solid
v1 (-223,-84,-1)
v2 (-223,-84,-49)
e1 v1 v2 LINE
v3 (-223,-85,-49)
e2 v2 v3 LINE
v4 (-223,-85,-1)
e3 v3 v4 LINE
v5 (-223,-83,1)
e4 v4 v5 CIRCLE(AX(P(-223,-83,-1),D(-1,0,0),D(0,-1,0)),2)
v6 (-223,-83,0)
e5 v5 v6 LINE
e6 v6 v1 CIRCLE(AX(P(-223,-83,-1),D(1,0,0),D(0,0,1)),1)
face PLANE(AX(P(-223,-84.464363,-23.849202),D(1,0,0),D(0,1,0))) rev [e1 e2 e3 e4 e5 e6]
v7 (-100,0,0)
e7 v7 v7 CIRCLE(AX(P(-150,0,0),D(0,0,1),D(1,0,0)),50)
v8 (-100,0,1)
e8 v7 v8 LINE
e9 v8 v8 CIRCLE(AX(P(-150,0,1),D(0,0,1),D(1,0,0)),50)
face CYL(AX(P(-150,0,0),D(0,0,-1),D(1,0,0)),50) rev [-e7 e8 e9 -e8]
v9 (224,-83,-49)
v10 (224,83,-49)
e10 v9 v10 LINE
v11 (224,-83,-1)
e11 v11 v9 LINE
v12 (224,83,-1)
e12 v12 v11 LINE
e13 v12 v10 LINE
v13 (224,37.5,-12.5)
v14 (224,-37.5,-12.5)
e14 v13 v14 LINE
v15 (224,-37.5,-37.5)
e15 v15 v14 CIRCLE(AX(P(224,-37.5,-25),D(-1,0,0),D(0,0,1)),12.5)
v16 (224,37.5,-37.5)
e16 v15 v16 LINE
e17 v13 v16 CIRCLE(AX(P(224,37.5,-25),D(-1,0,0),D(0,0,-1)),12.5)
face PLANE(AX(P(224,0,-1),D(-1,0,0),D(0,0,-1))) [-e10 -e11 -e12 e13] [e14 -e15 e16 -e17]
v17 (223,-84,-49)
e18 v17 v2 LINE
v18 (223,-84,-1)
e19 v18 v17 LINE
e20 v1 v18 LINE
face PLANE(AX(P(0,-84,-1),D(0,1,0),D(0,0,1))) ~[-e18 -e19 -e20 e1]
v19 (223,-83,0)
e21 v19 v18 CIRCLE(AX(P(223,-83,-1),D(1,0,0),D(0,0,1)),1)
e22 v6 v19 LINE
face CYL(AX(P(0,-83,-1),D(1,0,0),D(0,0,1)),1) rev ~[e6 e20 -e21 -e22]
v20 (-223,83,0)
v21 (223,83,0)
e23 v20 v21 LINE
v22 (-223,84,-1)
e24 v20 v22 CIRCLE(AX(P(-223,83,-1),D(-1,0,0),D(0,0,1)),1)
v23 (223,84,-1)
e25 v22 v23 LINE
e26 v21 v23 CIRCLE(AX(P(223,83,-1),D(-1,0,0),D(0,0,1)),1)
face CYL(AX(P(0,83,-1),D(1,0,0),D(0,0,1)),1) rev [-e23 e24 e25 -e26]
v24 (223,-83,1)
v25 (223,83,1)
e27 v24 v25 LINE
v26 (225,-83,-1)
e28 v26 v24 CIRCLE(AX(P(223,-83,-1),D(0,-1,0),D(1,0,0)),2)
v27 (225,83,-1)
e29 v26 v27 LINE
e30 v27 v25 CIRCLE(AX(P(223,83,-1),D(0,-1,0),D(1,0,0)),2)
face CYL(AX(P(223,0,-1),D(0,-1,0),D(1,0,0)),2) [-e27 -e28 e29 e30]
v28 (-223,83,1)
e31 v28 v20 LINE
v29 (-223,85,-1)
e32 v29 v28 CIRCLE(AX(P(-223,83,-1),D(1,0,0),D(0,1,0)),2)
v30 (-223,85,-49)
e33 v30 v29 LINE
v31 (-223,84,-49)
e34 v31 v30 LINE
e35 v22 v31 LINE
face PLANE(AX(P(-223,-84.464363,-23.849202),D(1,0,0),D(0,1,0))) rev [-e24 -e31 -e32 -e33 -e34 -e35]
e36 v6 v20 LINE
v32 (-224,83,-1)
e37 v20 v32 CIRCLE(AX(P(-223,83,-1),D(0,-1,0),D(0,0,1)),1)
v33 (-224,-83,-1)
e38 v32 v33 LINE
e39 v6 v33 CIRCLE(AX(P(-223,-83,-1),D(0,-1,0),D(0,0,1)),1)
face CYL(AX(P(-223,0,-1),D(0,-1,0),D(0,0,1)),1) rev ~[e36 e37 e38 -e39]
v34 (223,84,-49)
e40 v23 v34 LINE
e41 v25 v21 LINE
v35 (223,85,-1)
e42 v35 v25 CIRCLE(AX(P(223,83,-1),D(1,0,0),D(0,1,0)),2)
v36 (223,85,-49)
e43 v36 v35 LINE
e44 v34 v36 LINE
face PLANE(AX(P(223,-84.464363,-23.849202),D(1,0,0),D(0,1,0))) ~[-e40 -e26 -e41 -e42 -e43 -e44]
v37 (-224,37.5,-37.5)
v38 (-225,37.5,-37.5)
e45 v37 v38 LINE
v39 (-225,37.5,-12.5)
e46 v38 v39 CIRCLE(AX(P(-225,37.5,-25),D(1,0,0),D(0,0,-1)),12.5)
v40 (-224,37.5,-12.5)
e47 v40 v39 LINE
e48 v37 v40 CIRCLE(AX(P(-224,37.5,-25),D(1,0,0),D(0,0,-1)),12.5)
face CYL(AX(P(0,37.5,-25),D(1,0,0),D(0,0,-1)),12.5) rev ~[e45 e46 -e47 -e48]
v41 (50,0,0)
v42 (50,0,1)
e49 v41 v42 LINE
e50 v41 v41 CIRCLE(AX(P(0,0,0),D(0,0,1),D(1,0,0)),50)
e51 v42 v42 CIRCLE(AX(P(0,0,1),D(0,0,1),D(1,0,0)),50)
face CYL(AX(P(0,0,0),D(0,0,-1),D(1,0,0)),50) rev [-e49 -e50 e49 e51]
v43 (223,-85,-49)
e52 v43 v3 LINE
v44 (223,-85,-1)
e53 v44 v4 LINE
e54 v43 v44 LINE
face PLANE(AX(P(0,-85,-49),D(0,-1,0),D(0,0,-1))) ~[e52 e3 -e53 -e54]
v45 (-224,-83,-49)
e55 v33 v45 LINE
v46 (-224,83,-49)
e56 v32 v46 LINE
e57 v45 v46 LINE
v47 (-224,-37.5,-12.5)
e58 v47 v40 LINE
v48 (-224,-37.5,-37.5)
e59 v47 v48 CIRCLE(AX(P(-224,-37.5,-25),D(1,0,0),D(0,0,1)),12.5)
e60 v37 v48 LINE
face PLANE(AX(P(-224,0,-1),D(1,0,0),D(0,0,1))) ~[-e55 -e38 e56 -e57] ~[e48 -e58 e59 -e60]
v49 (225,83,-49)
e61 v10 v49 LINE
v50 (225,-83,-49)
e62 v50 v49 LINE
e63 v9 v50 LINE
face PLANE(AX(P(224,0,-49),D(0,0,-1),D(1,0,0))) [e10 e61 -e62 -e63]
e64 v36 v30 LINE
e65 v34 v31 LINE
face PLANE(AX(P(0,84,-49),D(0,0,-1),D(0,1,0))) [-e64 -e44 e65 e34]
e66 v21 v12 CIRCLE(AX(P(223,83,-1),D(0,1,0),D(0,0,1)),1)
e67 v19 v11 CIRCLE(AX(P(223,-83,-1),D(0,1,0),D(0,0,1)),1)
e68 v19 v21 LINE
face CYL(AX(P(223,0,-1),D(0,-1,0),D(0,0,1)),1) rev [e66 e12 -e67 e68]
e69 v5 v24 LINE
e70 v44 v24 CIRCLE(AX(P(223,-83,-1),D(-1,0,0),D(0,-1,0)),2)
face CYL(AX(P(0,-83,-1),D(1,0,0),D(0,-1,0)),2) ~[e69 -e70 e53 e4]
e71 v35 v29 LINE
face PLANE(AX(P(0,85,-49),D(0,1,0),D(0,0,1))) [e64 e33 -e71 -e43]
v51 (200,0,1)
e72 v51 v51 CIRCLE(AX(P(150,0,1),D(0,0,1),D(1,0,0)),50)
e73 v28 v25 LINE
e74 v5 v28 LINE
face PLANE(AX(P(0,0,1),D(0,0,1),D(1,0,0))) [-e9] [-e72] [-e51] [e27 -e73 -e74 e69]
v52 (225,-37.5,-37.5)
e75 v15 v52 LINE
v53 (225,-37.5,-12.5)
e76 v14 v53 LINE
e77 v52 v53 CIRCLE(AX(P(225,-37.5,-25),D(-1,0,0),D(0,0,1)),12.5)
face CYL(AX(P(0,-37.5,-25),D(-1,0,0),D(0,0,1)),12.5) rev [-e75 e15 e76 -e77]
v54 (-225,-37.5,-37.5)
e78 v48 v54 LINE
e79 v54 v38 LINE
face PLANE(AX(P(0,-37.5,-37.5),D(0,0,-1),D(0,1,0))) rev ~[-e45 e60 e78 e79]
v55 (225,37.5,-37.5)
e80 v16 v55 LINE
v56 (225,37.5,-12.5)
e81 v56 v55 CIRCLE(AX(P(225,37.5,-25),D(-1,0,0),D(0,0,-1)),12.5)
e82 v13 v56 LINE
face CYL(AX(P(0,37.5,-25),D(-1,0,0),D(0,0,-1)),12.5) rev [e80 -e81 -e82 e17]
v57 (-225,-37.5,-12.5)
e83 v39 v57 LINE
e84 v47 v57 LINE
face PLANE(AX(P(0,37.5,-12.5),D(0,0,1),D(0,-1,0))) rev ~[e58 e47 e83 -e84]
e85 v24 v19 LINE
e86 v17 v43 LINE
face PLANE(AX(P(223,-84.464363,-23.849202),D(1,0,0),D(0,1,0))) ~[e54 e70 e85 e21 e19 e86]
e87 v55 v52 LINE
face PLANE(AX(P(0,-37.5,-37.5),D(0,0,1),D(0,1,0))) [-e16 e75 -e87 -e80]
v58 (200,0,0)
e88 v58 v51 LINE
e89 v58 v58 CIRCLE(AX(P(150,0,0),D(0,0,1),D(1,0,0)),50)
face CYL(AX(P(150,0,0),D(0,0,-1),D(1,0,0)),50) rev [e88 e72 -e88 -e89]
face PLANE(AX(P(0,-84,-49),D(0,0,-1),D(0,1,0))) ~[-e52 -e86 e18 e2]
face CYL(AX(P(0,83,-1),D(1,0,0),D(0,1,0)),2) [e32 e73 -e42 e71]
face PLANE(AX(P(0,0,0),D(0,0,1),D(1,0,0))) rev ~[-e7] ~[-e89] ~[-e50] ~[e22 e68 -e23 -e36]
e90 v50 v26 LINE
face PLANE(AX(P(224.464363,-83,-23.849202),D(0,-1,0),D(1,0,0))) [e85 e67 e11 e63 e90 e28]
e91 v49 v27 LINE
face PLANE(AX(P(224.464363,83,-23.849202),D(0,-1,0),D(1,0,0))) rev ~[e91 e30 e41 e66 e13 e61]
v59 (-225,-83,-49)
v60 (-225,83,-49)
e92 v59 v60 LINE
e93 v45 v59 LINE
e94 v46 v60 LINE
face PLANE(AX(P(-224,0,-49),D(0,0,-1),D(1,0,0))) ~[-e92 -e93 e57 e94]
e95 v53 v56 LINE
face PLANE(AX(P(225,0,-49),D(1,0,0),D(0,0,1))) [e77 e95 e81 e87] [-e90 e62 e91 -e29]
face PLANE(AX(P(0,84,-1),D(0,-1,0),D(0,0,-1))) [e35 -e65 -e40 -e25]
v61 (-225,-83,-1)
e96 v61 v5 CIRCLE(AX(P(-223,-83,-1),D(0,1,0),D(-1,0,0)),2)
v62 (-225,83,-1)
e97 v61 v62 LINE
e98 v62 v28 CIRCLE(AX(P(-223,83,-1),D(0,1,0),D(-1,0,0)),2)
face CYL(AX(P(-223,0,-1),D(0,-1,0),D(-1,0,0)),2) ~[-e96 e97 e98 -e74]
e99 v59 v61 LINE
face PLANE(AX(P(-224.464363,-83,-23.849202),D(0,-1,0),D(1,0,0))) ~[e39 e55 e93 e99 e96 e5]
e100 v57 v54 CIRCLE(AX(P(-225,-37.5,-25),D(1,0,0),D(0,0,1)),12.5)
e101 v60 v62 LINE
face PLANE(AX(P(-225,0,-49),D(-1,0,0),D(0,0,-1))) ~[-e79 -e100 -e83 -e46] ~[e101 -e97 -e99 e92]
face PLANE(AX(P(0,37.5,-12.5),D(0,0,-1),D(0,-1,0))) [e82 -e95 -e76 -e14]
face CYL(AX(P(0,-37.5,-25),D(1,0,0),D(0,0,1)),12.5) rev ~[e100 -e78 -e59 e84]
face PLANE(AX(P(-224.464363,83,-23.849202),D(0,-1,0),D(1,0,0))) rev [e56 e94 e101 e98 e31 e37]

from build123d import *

# Parameters (mm, degrees)
F3_W           = 446
F3_H           = 166
F3_R           = 50
F4_DEPTH       = 1
F6_DEPTH       = 223
F8_DEPTH       = 83
F10_DEPTH      = 225.001
F10_DEPTH_BACK = 225.001


# Not quite as in the source:
# - a pattern or mirror of a feature is missing from the dataset's text; its kind, count and spacing are read off the source's solid


with BuildPart() as f4:
    # F3 (on Top) → F4 (new body)
    with BuildSketch(Plane.XY):
        Rectangle(F3_W, F3_H)
        with Locations((-150, 0)):
            Circle(F3_R, mode=Mode.SUBTRACT)
        Circle(F3_R, mode=Mode.SUBTRACT)
        with Locations((150, 0)):
            Circle(F3_R, mode=Mode.SUBTRACT)
    extrude(amount=F4_DEPTH)

    # F5 (on Right) → F6 (join, symmetric)
    with BuildSketch(Plane.YZ):
        with BuildLine():
            ThreePointArc((85, -1), (84.4142135624, 0.4142135624), (83, 1))
            Line((83, 1), (83, 0))
            ThreePointArc((83, 0), (83.7071067812, -0.2928932188), (84, -1))
            Line((84, -1), (84, -49))
            Line((84, -49), (85, -49))
            Line((85, -49), (85, -1))
        make_face()
    f6 = extrude(amount=F6_DEPTH, both=True)

    # F6_copies: F6 across plane
    add(f6.mirror(Plane(origin=(0, 0, 0), x_dir=(0, 0, -1), z_dir=(0, -1, 0))))

    # F7 (on Front) → F8 (join, symmetric)
    with BuildSketch(Plane.XZ):
        with BuildLine():
            ThreePointArc((225, -1), (224.4142135624, 0.4142135624), (223, 1))
            Line((223, 1), (223, 0))
            ThreePointArc((223, 0), (223.7071067812, -0.2928932188), (224, -1))
            Line((224, -1), (224, -49))
            Line((224, -49), (225, -49))
            Line((225, -49), (225, -1))
        make_face()
    f8 = extrude(amount=F8_DEPTH, both=True)

    # F8_copies: F8 across plane
    add(f8.mirror(Plane(origin=(0, 0, 0), x_dir=(0, 0, -1), z_dir=(-1, 0, 0))))

    # F9 (on Right) → F10 (cut, two sides)
    with BuildSketch(Plane.YZ) as f10_sk:
        with BuildLine():
            ThreePointArc((37.5, -37.5), (50, -25), (37.5, -12.5))
            Line((37.5, -12.5), (-37.5, -12.5))
            ThreePointArc((-37.5, -12.5), (-50, -25), (-37.5, -37.5))
            Line((-37.5, -37.5), (37.5, -37.5))
        make_face()
    extrude(amount=-F10_DEPTH, mode=Mode.SUBTRACT)
    extrude(f10_sk.sketch, amount=F10_DEPTH_BACK, mode=Mode.SUBTRACT)


solid = f4.part
